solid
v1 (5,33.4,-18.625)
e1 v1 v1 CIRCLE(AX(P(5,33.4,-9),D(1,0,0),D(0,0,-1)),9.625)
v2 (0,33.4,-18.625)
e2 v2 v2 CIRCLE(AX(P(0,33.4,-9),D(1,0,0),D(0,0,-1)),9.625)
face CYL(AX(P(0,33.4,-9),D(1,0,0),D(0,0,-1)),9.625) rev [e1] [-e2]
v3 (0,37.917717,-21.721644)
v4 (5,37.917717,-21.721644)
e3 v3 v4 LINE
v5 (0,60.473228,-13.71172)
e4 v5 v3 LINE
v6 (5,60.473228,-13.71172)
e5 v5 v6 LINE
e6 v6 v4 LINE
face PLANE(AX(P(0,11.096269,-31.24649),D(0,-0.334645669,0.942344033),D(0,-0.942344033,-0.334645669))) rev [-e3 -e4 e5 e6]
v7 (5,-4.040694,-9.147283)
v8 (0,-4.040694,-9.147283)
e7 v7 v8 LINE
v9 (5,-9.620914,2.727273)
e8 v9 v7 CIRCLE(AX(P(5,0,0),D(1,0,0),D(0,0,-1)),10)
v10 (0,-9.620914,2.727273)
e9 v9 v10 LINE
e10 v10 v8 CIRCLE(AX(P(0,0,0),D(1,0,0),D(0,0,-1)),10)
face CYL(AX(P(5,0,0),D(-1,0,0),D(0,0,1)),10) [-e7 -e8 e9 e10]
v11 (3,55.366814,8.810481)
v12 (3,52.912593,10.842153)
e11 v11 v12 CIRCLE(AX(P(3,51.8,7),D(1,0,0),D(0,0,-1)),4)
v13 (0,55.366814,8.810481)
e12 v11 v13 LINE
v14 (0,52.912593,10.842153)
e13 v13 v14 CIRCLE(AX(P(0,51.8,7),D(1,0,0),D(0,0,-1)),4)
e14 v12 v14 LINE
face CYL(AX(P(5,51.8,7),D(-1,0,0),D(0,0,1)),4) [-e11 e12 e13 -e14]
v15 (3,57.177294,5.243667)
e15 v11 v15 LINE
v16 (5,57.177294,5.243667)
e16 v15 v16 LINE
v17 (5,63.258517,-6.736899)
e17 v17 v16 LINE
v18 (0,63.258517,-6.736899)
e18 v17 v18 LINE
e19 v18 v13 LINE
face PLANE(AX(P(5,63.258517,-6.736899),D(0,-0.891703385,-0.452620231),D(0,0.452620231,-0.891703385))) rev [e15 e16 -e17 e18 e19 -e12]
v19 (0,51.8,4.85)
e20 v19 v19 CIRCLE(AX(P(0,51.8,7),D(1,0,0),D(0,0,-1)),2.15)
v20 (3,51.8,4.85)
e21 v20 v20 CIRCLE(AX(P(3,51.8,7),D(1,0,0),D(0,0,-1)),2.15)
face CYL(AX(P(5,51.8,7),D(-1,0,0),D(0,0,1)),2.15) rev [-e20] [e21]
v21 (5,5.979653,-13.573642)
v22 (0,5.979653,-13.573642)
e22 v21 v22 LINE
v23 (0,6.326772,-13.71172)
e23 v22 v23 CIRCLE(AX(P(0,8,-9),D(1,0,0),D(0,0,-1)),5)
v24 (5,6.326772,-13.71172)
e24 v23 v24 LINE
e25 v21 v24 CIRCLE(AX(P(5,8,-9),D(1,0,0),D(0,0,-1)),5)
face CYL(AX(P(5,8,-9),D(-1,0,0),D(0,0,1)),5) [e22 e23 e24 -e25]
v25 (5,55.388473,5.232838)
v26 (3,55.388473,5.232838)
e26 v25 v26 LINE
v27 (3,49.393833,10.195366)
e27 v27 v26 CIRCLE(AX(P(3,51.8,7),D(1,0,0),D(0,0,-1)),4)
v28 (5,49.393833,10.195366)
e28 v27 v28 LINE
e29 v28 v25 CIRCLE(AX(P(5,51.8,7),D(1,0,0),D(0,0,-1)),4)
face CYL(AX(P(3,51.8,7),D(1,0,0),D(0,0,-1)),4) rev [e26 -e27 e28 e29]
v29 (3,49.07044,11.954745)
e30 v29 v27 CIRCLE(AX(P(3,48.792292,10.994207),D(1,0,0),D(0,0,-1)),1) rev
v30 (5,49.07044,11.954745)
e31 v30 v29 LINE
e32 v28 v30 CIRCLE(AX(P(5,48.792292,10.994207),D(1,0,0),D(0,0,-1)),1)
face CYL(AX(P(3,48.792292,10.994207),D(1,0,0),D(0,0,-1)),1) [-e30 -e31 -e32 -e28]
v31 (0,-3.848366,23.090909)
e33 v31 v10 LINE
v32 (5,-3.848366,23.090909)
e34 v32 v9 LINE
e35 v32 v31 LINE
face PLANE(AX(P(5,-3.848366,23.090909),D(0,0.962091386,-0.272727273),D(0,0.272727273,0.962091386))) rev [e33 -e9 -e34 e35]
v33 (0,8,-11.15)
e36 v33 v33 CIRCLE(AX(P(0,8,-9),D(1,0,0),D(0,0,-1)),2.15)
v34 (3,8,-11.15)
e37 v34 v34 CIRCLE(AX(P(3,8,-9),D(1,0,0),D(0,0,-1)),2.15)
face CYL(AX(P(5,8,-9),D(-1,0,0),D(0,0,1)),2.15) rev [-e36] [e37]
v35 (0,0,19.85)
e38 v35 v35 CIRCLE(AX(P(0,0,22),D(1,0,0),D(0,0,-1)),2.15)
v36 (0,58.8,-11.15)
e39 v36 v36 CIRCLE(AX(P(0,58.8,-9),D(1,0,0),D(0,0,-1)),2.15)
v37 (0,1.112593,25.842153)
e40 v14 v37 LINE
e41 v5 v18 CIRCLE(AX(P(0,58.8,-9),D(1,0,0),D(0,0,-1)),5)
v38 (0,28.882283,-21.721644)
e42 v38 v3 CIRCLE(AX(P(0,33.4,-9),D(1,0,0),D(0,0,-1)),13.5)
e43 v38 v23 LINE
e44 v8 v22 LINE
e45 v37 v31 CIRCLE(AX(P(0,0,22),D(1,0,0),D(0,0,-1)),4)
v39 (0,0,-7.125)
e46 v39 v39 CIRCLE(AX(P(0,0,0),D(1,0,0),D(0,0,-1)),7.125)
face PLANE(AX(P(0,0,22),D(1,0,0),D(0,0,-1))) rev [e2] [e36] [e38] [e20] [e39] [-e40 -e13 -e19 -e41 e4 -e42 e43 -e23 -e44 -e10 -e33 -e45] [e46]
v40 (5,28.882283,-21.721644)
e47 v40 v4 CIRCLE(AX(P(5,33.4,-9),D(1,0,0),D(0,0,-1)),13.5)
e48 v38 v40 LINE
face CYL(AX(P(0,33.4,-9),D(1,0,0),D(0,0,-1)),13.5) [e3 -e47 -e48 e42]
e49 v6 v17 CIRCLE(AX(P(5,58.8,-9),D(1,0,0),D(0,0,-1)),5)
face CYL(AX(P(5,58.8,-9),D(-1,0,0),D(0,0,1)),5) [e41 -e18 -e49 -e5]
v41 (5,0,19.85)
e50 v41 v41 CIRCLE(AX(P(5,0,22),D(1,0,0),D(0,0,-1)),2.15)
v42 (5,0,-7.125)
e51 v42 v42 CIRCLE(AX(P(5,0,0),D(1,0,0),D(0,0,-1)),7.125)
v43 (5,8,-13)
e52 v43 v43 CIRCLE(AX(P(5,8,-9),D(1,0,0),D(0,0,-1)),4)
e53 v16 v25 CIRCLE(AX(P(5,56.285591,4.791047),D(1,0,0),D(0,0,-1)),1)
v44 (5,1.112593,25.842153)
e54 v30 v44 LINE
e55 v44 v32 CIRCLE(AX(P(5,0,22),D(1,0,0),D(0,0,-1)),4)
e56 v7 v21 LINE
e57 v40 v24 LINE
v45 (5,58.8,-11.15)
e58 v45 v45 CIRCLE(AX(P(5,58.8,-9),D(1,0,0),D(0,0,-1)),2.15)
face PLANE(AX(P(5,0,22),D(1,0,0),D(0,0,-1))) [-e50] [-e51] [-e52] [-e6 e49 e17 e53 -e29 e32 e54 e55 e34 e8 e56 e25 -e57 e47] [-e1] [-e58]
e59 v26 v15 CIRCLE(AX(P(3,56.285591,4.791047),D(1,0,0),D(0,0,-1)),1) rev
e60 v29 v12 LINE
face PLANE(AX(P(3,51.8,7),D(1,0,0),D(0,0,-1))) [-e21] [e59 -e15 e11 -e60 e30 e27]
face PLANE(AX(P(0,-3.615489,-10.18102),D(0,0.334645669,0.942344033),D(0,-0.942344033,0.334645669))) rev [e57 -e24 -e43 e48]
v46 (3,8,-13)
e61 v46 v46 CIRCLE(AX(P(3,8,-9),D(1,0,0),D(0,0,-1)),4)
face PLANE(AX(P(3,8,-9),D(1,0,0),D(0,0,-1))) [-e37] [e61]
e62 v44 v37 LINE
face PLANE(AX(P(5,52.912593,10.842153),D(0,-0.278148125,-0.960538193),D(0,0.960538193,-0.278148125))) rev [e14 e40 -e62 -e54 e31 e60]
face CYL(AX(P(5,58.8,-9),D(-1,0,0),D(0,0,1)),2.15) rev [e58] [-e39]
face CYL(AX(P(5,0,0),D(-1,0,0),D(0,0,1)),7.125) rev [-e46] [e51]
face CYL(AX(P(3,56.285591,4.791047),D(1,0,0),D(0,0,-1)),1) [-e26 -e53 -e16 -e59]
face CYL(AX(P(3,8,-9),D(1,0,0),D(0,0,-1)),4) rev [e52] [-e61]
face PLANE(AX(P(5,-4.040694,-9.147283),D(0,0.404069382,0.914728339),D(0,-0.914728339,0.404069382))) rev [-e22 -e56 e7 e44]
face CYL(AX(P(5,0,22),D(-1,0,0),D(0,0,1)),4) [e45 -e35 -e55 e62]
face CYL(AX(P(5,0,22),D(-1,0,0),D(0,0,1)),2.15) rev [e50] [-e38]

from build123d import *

# Parameters (mm, degrees)
SKETCH_1_R          = 2.15
SKETCH_1_R_2        = 7.125
EXTRUDE_1_DEPTH     = 5
EXTRUDE_START       = -5
SKETCH_2_R          = 13.5
SKETCH_2_R_2        = 9.5
EXTRUDE_2_DEPTH     = 5
CUT_EXTRUDE_START   = -2
SKETCH_3_R          = 4
CUT_EXTRUDE_1_DEPTH = 2
FILLET_START        = 3
FILLET_1_DEPTH      = 3
MOVE_FACE1_BY       = 0.125


with BuildPart() as part:
    # 草图1 → 凸台-拉伸1 (new body)
    with BuildSketch(Plane(origin=(0, 0, 0), x_dir=(0, 0, -1), z_dir=(1, 0, 0))):
        with BuildLine():
            Line((-23.090909091, -3.848365543), (-2.727272727, -9.620913858))
            ThreePointArc((-2.727272727, -9.620913858), (4.253098654, -9.050477989), (9.147283393, -4.040693817))
            Line((9.147283393, -4.040693817), (13.573641697, 5.979653091))
            ThreePointArc((13.573641697, 5.979653091), (13.638118854, 9.867579581), (10.897437667, 12.625984252))
            Line((10.897437667, 12.625984252), (1.979480632, 16.283858268))
            ThreePointArc((1.979480632, 16.283858268), (-9.5, 33.4), (1.979480632, 50.516141732))
            Line((1.979480632, 50.516141732), (10.897437667, 54.174015748))
            ThreePointArc((10.897437667, 54.174015748), (13.545928712, 60.881953925), (6.736898846, 63.258516924))
            Line((6.736898846, 63.258516924), (-8.810480924, 55.366813539))
            ThreePointArc((-8.810480924, 55.366813539), (-10.081211961, 54.350712224), (-10.842152772, 52.912592502))
            Line((-10.842152772, 52.912592502), (-25.842152772, 1.112592502))
            ThreePointArc((-25.842152772, 1.112592502), (-25.498078189, -1.939961078), (-23.090909091, -3.848365543))
        make_face()
        with Locations((9, 58.8)):
            Circle(SKETCH_1_R, mode=Mode.SUBTRACT)
        with Locations((-22, 0)):
            Circle(SKETCH_1_R, mode=Mode.SUBTRACT)
        with Locations((-7, 51.8)):
            Circle(SKETCH_1_R, mode=Mode.SUBTRACT)
        with Locations((9, 8)):
            Circle(SKETCH_1_R, mode=Mode.SUBTRACT)
        Circle(SKETCH_1_R_2, mode=Mode.SUBTRACT)
    extrude(amount=EXTRUDE_1_DEPTH)

    # 草图2 → 凸台-拉伸2 (add)
    # profile 1 of 2: a face of its own
    with BuildSketch(Plane(origin=(5, 0, 0), x_dir=(0, 0, -1), z_dir=(1, 0, 0)).offset(EXTRUDE_START)):
        with BuildLine():
            Line((21.721644442, 37.917716535), (13.711720164, 60.473228346))
            ThreePointArc((13.711720164, 60.473228346), (13.565113542, 56.760456337), (10.897437667, 54.174015748))
            Line((10.897437667, 54.174015748), (1.979480632, 50.516141732))
            ThreePointArc((1.979480632, 50.516141732), (-9.5, 33.4), (1.979480632, 16.283858268))
            Line((1.979480632, 16.283858268), (10.897437667, 12.625984252))
            ThreePointArc((10.897437667, 12.625984252), (13.565113542, 10.039543663), (13.711720164, 6.326771654))
            Line((13.711720164, 6.326771654), (21.721644442, 28.882283465))
            ThreePointArc((21.721644442, 28.882283465), (-4.5, 33.4), (21.721644442, 37.917716535))
        make_face()
    # profile 2 of 2: a face of its own
    with BuildSketch(Plane(origin=(5, 0, 0), x_dir=(0, 0, -1), z_dir=(1, 0, 0)).offset(EXTRUDE_START)):
        with Locations((9, 33.4)):
            Circle(SKETCH_2_R)
        with Locations((9, 33.4)):
            Circle(SKETCH_2_R_2, mode=Mode.SUBTRACT)
    extrude(amount=EXTRUDE_2_DEPTH)

    # 草图3 → 切除-拉伸1 (cut)
    with BuildSketch(Plane(origin=(5, 0, 0), x_dir=(0, 0, -1), z_dir=(1, 0, 0)).offset(CUT_EXTRUDE_START)):
        with Locations((-7, 51.8)):
            Circle(SKETCH_3_R)
        with Locations((9, 8)):
            Circle(SKETCH_3_R)
    extrude(amount=CUT_EXTRUDE_1_DEPTH, mode=Mode.SUBTRACT)

    # 圆角1: read off the stored shape, not the designer's step
    # 圆角1 outline → 圆角1 (cut)
    with BuildSketch(Plane.YZ.offset(FILLET_START)):
        with BuildLine():
            ThreePointArc((49.070439729, 11.954745274), (49.775814705, 11.174989574), (49.393833283, 10.195365665))
            ThreePointArc((49.393833283, 10.195365665), (51.07687003, 10.934092404), (52.912592502, 10.842152772))
            Line((52.912592502, 10.842152772), (49.070439729, 11.954745274))
        make_face()
        with BuildLine():
            ThreePointArc((55.388472863, 5.232837723), (56.279537114, 5.791028828), (57.177294463, 5.243667384))
            Line((57.177294463, 5.243667384), (55.366813539, 8.810480924))
            ThreePointArc((55.366813539, 8.810480924), (55.799926698, 7.02421586), (55.388472863, 5.232837723))
        make_face()
    extrude(amount=FILLET_1_DEPTH, mode=Mode.SUBTRACT)

    # Move Face1: a curved face moved inward by 0.125
    add(Solid.thicken(part.faces().sort_by_distance((2.5, 33.4, 0.5))[0], -MOVE_FACE1_BY), mode=Mode.SUBTRACT)


solid = part.part
